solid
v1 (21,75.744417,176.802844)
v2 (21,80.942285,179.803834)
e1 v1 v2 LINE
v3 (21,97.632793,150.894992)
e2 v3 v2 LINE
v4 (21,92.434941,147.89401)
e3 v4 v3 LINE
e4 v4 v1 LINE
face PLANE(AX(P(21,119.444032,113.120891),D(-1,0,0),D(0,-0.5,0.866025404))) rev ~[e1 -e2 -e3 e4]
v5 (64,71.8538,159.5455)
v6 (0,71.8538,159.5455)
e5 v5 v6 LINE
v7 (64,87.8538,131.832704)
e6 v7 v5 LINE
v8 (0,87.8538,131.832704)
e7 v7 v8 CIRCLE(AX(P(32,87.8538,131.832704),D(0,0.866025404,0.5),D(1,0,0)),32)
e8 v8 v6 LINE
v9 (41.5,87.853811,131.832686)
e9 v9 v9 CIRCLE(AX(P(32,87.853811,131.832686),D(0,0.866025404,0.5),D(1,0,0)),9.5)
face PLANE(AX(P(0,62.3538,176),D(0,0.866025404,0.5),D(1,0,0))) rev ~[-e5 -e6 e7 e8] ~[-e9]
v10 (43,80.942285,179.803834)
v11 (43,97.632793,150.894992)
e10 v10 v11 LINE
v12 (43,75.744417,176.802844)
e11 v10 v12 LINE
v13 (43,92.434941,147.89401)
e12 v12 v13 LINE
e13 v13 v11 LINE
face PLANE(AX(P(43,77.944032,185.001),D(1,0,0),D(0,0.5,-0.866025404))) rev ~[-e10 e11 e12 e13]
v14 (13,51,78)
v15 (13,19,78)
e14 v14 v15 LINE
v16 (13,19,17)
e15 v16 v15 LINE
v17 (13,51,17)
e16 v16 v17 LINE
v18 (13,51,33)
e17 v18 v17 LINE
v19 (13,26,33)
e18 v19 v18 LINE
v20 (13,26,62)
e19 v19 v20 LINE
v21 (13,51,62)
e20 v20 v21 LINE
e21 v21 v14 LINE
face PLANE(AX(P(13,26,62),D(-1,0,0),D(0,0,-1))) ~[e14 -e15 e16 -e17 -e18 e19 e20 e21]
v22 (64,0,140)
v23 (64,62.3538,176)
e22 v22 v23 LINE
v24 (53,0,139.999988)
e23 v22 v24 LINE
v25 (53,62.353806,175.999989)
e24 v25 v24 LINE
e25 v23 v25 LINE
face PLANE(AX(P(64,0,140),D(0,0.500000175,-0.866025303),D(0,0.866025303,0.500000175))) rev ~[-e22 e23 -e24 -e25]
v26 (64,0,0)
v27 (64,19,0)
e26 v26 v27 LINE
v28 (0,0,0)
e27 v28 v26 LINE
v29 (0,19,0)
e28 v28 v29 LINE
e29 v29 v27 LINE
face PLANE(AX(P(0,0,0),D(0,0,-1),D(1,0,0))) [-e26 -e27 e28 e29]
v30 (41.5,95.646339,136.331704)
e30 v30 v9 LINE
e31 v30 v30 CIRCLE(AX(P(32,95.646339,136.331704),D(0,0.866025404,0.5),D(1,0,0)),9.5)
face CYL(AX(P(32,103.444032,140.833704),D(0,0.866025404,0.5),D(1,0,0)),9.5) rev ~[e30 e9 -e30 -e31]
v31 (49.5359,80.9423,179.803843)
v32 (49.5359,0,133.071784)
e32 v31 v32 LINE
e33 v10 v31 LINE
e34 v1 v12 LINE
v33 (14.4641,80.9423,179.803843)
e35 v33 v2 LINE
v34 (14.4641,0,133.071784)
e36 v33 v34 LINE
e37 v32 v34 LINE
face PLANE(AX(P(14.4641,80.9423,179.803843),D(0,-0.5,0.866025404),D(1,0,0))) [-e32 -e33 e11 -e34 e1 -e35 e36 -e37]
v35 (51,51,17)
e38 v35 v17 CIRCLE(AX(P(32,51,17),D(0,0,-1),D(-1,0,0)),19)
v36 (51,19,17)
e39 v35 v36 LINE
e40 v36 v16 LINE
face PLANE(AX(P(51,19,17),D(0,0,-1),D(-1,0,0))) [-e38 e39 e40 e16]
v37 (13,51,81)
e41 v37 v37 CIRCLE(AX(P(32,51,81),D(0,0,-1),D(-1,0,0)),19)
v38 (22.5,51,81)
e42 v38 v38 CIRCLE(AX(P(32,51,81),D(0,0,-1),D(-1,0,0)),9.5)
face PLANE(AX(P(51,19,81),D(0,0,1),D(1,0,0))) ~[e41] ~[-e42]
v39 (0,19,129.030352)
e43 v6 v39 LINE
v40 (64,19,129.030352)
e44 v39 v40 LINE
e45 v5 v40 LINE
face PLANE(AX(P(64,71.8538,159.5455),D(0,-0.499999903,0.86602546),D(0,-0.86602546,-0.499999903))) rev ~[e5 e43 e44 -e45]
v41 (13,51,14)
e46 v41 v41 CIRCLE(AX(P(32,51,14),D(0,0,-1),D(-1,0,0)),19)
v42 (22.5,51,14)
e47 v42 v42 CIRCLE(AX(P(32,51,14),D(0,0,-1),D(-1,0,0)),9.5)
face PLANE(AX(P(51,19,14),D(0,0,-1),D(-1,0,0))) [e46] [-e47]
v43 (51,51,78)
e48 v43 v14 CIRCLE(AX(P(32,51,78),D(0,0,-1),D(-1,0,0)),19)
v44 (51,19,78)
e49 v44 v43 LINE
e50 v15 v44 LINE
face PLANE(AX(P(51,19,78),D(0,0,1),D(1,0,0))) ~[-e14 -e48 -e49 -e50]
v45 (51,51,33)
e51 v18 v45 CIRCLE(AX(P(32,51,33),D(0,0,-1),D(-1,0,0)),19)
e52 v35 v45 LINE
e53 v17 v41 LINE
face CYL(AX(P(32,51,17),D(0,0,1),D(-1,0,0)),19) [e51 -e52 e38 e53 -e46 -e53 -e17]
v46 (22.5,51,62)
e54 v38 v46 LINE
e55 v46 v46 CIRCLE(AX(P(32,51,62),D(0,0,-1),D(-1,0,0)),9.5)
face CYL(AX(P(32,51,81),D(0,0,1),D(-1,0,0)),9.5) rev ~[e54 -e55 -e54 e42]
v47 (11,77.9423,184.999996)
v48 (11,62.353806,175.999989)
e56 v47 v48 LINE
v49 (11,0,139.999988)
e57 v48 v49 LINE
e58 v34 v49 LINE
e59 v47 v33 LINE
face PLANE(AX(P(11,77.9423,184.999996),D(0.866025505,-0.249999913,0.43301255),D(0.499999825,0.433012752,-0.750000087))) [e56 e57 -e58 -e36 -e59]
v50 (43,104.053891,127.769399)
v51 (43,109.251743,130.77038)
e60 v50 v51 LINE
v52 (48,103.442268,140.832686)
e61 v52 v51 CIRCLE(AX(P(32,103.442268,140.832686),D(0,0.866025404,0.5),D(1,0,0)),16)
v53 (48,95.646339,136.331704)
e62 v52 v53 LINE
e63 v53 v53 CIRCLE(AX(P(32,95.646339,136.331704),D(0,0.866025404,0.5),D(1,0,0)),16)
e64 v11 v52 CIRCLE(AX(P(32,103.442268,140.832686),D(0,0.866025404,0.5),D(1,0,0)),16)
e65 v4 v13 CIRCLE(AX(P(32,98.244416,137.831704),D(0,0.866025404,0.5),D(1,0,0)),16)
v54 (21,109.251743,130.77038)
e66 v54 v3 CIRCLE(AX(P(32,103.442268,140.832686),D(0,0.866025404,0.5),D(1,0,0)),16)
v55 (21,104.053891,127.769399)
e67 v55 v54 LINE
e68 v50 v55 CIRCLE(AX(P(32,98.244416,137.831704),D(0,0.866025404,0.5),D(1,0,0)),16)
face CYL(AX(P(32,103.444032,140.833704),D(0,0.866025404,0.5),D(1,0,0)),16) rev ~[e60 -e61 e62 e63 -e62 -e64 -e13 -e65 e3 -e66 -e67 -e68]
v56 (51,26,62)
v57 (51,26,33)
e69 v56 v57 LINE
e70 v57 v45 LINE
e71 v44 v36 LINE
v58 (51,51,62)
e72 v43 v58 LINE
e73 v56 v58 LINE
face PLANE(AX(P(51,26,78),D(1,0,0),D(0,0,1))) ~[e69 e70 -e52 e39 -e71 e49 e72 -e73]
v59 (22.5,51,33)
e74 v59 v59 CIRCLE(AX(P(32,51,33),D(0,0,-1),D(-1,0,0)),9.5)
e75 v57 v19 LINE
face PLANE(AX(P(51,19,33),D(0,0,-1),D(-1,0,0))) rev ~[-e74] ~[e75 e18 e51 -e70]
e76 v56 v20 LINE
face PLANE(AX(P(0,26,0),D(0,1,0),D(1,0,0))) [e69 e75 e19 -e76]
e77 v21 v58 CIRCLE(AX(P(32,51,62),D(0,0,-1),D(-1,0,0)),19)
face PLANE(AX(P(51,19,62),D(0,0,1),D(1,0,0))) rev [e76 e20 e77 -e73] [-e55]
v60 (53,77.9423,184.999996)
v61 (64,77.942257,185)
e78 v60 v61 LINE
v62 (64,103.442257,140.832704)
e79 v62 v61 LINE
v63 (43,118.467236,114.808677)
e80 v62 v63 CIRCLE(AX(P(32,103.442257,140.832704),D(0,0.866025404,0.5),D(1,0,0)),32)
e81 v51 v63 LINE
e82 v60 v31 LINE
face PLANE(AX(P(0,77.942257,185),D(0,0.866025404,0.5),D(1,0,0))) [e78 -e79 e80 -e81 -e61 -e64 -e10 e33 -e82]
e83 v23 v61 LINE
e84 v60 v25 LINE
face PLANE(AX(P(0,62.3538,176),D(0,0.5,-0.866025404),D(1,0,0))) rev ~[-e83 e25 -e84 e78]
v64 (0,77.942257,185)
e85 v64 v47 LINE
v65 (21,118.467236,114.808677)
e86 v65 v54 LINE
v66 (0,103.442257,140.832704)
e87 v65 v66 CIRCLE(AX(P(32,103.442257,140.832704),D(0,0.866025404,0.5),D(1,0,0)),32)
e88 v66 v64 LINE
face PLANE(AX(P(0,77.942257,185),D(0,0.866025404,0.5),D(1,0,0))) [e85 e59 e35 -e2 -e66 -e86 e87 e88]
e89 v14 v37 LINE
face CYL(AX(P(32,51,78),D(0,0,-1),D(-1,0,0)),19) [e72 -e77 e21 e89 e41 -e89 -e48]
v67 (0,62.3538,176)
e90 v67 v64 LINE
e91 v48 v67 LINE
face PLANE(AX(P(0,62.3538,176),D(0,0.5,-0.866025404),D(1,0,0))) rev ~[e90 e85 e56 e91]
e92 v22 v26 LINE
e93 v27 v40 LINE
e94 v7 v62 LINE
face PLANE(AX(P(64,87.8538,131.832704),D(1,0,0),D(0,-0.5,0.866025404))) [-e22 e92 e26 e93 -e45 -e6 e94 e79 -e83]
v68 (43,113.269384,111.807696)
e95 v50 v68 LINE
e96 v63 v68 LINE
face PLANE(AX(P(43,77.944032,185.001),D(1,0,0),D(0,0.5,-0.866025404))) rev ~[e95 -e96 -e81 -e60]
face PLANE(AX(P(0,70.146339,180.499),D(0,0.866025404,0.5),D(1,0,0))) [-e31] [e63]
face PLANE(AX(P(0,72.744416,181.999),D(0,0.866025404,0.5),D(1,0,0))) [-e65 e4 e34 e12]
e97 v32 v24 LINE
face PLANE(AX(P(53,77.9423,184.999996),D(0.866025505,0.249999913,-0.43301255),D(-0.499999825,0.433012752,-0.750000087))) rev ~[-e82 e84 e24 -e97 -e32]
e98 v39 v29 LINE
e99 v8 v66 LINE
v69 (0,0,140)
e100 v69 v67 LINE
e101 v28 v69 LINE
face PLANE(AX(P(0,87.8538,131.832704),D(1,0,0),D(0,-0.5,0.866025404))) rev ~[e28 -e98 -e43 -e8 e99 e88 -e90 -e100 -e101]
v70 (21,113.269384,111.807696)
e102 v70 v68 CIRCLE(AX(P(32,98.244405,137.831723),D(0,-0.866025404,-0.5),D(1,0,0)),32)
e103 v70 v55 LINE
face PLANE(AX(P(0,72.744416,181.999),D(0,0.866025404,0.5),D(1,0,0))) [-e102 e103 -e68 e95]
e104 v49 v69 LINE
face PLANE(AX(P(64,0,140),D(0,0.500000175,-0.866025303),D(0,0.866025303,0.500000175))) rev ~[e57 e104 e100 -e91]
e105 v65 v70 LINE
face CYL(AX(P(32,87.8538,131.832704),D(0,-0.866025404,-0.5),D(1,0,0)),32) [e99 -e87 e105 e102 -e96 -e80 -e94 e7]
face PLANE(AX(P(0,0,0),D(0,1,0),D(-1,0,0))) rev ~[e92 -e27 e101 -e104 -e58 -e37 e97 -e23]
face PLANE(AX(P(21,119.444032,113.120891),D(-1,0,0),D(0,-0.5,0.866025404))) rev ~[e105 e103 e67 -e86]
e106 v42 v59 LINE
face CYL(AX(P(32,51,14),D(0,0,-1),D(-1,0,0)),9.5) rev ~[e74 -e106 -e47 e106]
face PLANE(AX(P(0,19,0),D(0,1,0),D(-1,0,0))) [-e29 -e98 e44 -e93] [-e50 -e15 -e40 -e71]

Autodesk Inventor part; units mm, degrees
ref_plane "YZ Plane" through (0, 0, 0) normal (1, 0, 0) x (0, 1, 0)
sketch "Sketch1" plane through (0, 0, 0) normal (0, 1, 0) x (-1, 0, 0)
  line L0 (0, 0) -> (-64, 0)
  line L1 (-64, 0) -> (-64, 140)
  line L2 (-64, 140) -> (0, 140)
  line L3 (0, 140) -> (0, 0)
  dimension "d0" = 140
  dimension "d1" = 64
extrude "Extrusion1" add sketch "Sketch1" along normal blind 19
sketch "Sketch3" plane through (64, 0, 140) normal (1, 0, 0) x (0, 0, -1)
  line L0 (0, 0) -> (-36, 62.3538)
  line L1 (0, 0) -> (72, 0) construction
  line L2 (-36, 62.3538) -> (-19.5455, 71.8538)
  line L3 (-19.5455, 71.8538) -> (21.9393, 0)
  line L4 (0, 0) -> (140, 0) projected
  line L5 (21.9393, 0) -> (0, 0)
  dimension "d4" = 72
  dimension "d5" = 120
  dimension "d6" = 19
  dimension "d7" = 90
extrude "Extrusion2" add sketch "Sketch3" against normal up to surface (64 mm away)
sketch "Sketch4" plane through (0, 62.3538, 176) normal (0, 0.8660254, 0.5) x (1, 0, 0)
  line L0 (64, 0) -> (0, 0) construction
  line L1 (32, 0) -> (32, 51) construction
  line L2 (32, 0) -> (83, 0) construction
  arc A0 (64, 51) -> (0, 51) centre (32, 51) ccw
  line L3 (0, 51) -> (0, 0)
  line L4 (64, 51) -> (64, 0)
  line L5 (0, 0) -> (64, 0)
  point P0 (0, 121.2436)
  dimension "d10" = 51
  dimension "d11" = 90
  dimension "d12" = 64
extrude "Extrusion3" add sketch "Sketch4" along normal blind 18
sketch "Sketch5" plane through (0, 77.9423, 185) normal (0, 0.8660254, 0.5) x (1, 0, 0)
  line L0 (0, 0) -> (64, 0) construction
  line L1 (32, 0) -> (32, 51) construction
  circle A0 centre (32, 51) radius 9.5
  point P0 (0, 121.2436)
  dimension "d15" = 51
  dimension "d16" = 19
extrude "Extrusion4" cut sketch "Sketch5" against normal up to surface (18 mm away)
sketch "Sketch6" plane through (0, 77.9423, 185) normal (0, 0.8660254, 0.5) x (1, 0, 0)
  circle A0 centre (32, 51) radius 9.5 construction
  circle A1 centre (32, 51) radius 16
  point P0 (0, 121.2436)
  dimension "d19" = 32
extrude "Extrusion5" cut sketch "Sketch6" against normal blind 9
sketch "Sketch9" plane through (0, 77.9423, 185) normal (0, 0.8660254, 0.5) x (1, 0, 0)
  line L0 (0, 0) -> (64, 0) construction
  line L1 (32, 0) -> (32, 83) construction
  arc A0 (64, 51) -> (0, 51) centre (32, 51) ccw construction
  line L2 (32, 0) -> (115, 0) construction
  arc A1 (64, 51) -> (0, 51) centre (32, 51) ccw construction
  line L3 (32, 83) -> (43, 83) construction
  line L4 (32, 83) -> (43, 83) construction
  line L5 (43, 83) -> (21, 83)
  line L6 (21, 83) -> (21, 0)
  line L7 (21, 0) -> (43, 0)
  line L8 (43, 0) -> (43, 83)
  point P0 (0, 121.2436)
  dimension "d22" = 90
  dimension "d23" = 11
  dimension "d24" = 0
  dimension "d25" = 22
  dimension "d26" = 83
extrude "Extrusion6" cut sketch "Sketch9" against normal blind 6
ref_plane "Work Plane1" through (64, 103.4423, 140.8327) normal (0, 0.8660254, 0.5) x (1, 0, 0)
sketch "Sketch10" plane through (64, 103.4423, 140.8327) normal (0, 0.8660254, 0.5) x (1, 0, 0)
  line L0 (-64, -51) -> (-43, -51) construction
  line L1 (-64, -51) -> (-64, -45) construction
  line L2 (-64, 0) -> (-64, -51) construction
  line L3 (-64, -45) -> (0, -45) construction
  line L4 (0, -51) -> (0, 0) construction
  line L5 (-32, -45) -> (-32, -51) construction
  line L6 (-21, -51) -> (-43, -51) construction
  line L7 (-32, -51) -> (-11, -51) construction
  line L8 (-32, -51) -> (-11, -51) construction
  line L9 (-11, -51) -> (-53, -51)
  line L10 (-11, -51) -> (31, -51) construction
  line L11 (-53, -51) -> (-49.5359, -45)
  line L12 (-53, -51) -> (-46.0718, -51) construction
  line L13 (-11, -51) -> (-14.4641, -45)
  line L14 (-49.5359, -45) -> (-14.4641, -45)
  point P0 (-64, 70.2436)
  dimension "d29" = 6
  dimension "d30" = 21
  dimension "d31" = 0
  dimension "d32" = 42
  dimension "d33" = 180
  dimension "d34" = 60
extrude "Extrusion7" cut sketch "Sketch10" against normal up to surface surface through (32, 0, 70) normal (0, 1, 0)
sketch "Sketch11" plane through (0, 19, 0) normal (0, 1, 0) x (1, 0, 0)
  line L0 (64, 0) -> (0, 0) construction
  line L1 (0, 0) -> (0, -140) construction
  line L2 (64, 0) -> (0, 0) construction
  line L3 (0, 0) -> (0, -17) construction
  line L4 (0, -17) -> (64, -17) construction
  line L5 (64, -17) -> (64, 0) construction
  line L6 (64, 0) -> (51, 0) construction
  line L7 (51, 0) -> (51, -17) construction
  line L8 (51, -17) -> (64, -17) construction
  line L9 (64, -17) -> (64, 0) construction
  line L10 (51, -17) -> (13, -17)
  line L11 (13, -17) -> (13, -78)
  line L12 (13, -78) -> (51, -78)
  line L13 (51, -78) -> (51, -17)
  dimension "d39" = 17
  dimension "d40" = 13
  dimension "d41" = 17
  dimension "d42" = 38
  dimension "d43" = 61
extrude "Extrusion8" add sketch "Sketch11" along normal blind 7
sketch "Sketch12" plane through (0, 26, 0) normal (0, 1, 0) x (1, 0, 0)
  line L0 (13, -78) -> (13, -17) construction
  line L1 (13, -47.5) -> (51, -47.5) construction
  line L2 (51, -17) -> (51, -78) construction
  line L3 (13, -17) -> (51, -17) construction
  line L4 (32, -17) -> (32, -78) construction
  line L5 (13, -62) -> (51, -62) construction
  line L6 (51, -62) -> (51, -33) construction
  line L7 (51, -33) -> (13, -33) construction
  line L8 (13, -33) -> (13, -62) construction
  line L9 (13, -62) -> (51, -33) construction
  line L10 (51, -62) -> (13, -33) construction
  line L11 (13, -17) -> (51, -17)
  line L12 (51, -17) -> (51, -33)
  line L13 (51, -33) -> (13, -33)
  line L14 (13, -33) -> (13, -17)
  line L15 (51, -78) -> (13, -78) projected
  line L16 (13, -62) -> (51, -62)
  line L17 (51, -62) -> (51, -78)
  line L18 (51, -78) -> (13, -78)
  line L19 (13, -78) -> (13, -62)
  point P0 (0, 0)
  point P1 (32, -47.5)
  dimension "d46" = 29
  dimension "d47" = 45
  dimension "d48" = 45
extrude "Extrusion9" add sketch "Sketch12" along normal blind 25 contours L11 L12 L13 L14
ref_plane "Work Plane2" through (32, 26, 47.5) normal (0, 0, 1) x (1, 0, 0)
sketch "Sketch14" plane through (51, 19, 17) normal (0, 0, -1) x (-1, 0, 0)
  line L0 (0, 32) -> (38, 32) projected
  arc A0 (38, 32) -> (0, 32) centre (19, 32) ccw
  point P0 (51, -19)
extrude "Extrusion10" add sketch "Sketch14" against normal up to surface (16 mm away)
sketch "Sketch15" plane through (51, 19, 17) normal (0, 0, -1) x (-1, 0, 0)
  arc A0 (38, 32) -> (0, 32) centre (19, 32) ccw construction
  line L0 (38, 0) -> (38, 32) construction
  circle A1 centre (19, 32) radius 19
  point P0 (51, -19)
extrude "Extrusion11" add sketch "Sketch15" along normal blind 3
sketch "Sketch16" plane through (32, 51, 14) normal (0, 0, -1) x (-1, 0, 0)
  circle A0 centre (0, 0) radius 9.5
  point P0 (32, -51)
  dimension "d55" = 19
extrude "Extrusion12" cut sketch "Sketch16" against normal up to surface (19 mm away)
mirror "Mirror1" about plane through (32, 26, 47.5) normal (0, 0, 1) of "Extrusion10", "Extrusion11", "Extrusion12", "Extrusion9"
properties part number "1.1"
